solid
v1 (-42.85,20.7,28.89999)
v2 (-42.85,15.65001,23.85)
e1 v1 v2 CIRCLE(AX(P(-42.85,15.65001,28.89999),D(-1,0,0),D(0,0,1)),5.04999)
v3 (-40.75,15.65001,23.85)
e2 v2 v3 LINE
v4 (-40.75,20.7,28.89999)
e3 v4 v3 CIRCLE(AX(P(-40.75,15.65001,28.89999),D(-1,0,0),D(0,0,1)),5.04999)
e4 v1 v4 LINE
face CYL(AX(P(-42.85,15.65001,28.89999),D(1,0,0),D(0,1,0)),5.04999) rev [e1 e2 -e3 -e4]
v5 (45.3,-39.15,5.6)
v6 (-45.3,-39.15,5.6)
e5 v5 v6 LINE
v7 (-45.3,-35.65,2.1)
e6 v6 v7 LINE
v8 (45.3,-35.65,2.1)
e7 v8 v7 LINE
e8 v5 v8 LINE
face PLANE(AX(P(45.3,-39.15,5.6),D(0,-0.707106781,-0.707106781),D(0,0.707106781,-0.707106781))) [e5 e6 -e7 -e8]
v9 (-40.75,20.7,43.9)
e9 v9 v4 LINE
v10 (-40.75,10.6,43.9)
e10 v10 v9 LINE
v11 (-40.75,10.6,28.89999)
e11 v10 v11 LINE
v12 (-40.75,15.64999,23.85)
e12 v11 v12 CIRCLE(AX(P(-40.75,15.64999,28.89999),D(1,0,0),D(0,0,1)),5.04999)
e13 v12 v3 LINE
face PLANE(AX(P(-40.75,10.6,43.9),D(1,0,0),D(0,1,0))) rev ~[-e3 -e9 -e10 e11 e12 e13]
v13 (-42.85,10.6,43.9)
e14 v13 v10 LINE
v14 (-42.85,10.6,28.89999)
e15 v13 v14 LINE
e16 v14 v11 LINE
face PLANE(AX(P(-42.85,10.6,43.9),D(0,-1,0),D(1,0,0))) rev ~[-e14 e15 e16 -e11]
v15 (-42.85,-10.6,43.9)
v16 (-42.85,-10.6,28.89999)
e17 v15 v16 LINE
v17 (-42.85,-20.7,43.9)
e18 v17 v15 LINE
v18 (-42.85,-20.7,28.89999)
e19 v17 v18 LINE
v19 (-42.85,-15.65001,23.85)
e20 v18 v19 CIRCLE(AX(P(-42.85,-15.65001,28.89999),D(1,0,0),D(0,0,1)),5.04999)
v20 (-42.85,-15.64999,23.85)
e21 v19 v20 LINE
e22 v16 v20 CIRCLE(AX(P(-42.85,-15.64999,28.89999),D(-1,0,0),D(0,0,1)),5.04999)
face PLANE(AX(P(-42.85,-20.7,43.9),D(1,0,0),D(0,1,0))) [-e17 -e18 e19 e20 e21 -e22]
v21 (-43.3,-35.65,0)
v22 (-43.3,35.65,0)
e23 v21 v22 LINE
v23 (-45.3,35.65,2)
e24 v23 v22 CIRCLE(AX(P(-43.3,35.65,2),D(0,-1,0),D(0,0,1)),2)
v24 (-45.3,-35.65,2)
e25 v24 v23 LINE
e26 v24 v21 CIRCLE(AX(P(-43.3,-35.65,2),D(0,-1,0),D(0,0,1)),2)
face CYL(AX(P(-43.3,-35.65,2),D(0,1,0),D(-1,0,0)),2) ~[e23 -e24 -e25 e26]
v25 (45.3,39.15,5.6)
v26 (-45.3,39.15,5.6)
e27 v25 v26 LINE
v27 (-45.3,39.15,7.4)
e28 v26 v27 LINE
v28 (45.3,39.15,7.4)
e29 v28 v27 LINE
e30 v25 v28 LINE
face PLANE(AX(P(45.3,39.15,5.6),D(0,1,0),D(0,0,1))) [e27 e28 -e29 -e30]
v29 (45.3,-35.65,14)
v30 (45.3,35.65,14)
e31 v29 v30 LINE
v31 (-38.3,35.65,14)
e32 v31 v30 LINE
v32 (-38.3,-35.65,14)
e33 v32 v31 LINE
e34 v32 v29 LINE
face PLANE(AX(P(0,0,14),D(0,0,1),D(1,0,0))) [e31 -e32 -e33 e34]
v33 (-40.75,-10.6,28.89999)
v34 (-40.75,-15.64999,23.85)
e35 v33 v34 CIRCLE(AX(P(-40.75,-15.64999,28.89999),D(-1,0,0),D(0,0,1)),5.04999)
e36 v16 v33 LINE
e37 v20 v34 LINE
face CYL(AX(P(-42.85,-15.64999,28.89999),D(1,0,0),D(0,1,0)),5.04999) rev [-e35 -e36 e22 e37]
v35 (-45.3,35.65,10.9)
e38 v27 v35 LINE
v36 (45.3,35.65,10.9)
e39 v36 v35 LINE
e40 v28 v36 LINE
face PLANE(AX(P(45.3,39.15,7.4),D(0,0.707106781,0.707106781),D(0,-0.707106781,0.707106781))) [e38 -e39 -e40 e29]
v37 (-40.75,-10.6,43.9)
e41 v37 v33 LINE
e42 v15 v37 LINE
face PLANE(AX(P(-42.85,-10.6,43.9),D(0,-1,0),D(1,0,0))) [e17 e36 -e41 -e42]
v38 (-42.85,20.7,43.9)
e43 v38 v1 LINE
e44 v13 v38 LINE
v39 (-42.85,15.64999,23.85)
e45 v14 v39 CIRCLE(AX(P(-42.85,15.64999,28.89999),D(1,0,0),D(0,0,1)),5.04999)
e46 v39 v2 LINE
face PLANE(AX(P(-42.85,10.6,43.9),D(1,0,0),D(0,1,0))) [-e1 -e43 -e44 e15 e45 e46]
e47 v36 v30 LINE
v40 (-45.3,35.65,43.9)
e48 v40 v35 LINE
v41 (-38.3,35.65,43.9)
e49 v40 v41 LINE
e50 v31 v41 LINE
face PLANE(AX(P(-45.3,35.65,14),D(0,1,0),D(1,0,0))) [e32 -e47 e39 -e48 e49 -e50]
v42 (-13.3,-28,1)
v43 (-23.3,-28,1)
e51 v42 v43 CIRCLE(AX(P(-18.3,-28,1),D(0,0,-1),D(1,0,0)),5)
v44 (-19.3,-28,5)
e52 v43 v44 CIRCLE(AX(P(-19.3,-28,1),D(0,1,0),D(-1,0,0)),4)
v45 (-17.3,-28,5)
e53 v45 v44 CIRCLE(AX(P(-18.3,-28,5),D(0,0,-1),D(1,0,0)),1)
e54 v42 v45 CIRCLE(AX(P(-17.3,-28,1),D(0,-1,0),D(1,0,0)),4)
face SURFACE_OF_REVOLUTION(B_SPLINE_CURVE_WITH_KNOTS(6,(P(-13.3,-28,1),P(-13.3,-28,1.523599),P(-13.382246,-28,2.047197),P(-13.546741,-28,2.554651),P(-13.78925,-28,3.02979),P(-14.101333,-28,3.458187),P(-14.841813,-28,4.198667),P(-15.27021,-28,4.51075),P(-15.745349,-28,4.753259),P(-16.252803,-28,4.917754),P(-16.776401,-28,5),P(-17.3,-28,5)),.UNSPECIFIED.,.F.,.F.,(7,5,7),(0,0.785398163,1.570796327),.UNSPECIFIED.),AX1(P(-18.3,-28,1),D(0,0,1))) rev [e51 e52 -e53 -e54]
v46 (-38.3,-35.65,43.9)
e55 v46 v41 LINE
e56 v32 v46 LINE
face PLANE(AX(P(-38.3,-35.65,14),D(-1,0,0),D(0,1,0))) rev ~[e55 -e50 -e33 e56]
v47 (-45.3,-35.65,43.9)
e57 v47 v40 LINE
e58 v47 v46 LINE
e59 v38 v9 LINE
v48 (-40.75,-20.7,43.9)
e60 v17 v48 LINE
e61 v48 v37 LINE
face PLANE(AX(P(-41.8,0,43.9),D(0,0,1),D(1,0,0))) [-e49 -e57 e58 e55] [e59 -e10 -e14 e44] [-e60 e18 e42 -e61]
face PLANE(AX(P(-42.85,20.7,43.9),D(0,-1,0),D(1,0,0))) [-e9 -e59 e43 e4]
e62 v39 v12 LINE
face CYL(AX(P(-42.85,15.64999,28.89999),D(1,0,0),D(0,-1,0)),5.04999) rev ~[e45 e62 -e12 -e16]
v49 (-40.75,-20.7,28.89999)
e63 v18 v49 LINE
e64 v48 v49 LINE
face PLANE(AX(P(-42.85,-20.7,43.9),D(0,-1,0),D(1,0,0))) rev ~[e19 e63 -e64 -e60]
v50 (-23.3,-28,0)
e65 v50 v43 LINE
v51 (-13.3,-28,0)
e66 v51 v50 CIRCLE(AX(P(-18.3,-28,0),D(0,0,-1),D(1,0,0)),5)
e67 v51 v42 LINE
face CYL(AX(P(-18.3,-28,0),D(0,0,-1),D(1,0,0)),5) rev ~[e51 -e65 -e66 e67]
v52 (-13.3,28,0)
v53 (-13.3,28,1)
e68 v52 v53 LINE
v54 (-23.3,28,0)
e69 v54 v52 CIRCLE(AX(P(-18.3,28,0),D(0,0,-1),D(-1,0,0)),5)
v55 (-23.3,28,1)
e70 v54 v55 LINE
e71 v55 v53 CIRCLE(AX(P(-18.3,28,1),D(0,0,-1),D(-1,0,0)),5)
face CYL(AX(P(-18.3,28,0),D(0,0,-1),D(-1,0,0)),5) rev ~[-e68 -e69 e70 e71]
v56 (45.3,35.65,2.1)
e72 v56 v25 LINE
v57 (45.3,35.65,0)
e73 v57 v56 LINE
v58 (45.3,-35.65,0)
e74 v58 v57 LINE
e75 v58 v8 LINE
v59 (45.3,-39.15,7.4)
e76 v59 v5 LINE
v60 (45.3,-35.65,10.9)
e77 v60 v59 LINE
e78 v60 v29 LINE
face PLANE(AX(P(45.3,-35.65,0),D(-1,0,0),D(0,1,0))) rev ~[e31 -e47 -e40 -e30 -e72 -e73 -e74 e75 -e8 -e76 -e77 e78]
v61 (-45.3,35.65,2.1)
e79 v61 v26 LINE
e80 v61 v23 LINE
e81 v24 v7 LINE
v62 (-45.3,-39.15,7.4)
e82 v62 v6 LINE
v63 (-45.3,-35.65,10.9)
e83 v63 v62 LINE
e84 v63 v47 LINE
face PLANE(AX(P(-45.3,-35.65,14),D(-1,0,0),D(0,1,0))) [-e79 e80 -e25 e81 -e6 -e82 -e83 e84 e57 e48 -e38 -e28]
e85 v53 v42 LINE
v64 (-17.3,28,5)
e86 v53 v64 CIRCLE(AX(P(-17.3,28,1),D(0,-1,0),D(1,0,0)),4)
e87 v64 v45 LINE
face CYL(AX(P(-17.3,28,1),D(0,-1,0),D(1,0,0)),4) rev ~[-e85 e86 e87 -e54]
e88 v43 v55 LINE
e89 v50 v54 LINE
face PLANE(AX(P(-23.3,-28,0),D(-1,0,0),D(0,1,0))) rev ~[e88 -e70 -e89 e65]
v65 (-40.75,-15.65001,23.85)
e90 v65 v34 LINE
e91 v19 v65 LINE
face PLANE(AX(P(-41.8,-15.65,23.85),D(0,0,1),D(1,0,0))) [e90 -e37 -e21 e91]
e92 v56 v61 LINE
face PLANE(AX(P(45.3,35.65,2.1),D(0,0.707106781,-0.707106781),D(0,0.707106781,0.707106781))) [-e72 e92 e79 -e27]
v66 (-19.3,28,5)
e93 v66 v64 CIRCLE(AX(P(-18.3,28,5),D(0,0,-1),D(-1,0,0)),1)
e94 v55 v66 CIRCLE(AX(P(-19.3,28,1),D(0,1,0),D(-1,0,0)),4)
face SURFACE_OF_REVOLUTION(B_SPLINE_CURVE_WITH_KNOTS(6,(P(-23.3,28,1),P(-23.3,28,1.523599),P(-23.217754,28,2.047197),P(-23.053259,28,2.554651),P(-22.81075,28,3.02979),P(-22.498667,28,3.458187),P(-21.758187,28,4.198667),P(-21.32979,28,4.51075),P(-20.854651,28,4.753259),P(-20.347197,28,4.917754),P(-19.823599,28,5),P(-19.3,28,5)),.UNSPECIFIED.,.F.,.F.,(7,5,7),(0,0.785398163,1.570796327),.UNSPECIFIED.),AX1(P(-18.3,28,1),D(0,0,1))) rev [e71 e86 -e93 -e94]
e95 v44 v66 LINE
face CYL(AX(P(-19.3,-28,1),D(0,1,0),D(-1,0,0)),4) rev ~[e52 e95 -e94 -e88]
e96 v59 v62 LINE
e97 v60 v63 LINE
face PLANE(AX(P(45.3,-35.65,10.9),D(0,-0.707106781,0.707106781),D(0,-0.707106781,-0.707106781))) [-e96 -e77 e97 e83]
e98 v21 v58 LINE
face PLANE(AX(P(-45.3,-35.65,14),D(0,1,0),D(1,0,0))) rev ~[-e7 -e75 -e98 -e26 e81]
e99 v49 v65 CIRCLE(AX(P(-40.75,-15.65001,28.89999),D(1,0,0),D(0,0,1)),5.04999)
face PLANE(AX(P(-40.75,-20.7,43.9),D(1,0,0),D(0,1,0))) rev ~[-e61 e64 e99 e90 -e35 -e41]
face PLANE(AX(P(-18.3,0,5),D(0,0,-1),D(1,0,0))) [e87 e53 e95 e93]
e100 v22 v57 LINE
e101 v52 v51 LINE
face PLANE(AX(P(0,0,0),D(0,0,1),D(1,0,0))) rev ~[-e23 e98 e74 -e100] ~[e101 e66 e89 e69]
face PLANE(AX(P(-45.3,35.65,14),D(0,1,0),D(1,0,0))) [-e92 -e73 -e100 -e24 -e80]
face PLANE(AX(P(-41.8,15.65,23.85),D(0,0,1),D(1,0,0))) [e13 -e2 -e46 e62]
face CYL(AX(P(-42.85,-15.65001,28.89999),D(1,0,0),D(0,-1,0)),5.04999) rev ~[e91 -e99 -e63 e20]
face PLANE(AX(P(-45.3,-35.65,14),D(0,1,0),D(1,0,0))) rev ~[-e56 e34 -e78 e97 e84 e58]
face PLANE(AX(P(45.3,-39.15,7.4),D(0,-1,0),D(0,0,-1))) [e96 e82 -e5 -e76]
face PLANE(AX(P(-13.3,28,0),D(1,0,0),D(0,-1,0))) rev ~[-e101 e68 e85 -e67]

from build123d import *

# Parameters (mm, degrees)
F0_W      = 90.6
F0_H      = 71.3
F1_DEPTH  = 14
F2_W      = 7
F2_H      = 71.3
F3_DEPTH  = 29.9
F5_DEPTH  = 90.6
F7_W      = 2.1
F7_H      = 10.1
F8_DEPTH  = 20.05
F9_R      = 5.04999
F10_R     = 2
F12_DEPTH = 5
F13_R     = 4


# Not quite as in the source:
# - a fillet or chamfer is up to 0.001 mm smaller than in the source, because OpenCascade refuses the exact size


with BuildPart() as f1:
    # F0 (on Top) → F1 (new body)
    with BuildSketch(Plane.XY):
        Rectangle(F0_W, F0_H)
    extrude(amount=F1_DEPTH)

    # F2 (on face) → F3 (join)
    with BuildSketch(Plane.XY.offset(14)):
        with Locations((-41.8, 0)):
            Rectangle(F2_W, F2_H)
    extrude(amount=F3_DEPTH)


with BuildPart() as f5:
    # F4 (on face) → F5 (new body)
    with BuildSketch(Plane.YZ.offset(45.3)):
        Polygon((-39.15, 5.6), (-35.65, 2.1), (-35.65, 10.9), (-39.15, 7.4), align=None)
    extrude(amount=-F5_DEPTH)


with BuildPart() as f5b:
    # F4 (on face) → F5, piece 2 (new body)
    with BuildSketch(Plane.YZ.offset(45.3)):
        Polygon((35.65, 10.9), (35.65, 2.1), (39.15, 5.6), (39.15, 7.4), align=None)
    extrude(amount=-F5_DEPTH)


with BuildPart() as f5_1:
    add(f5.part)

    # F6: union F1, F5b
    add(f1.part)
    add(f5b.part)

    # F7 (on face) → F8 (cut)
    with BuildSketch(Plane.XY.offset(43.9)):
        with Locations((-41.8, -15.65)):
            Rectangle(F7_W, F7_H)
        with Locations((-41.8, 15.65)):
            Rectangle(F7_W, F7_H)
    extrude(amount=-F8_DEPTH, mode=Mode.SUBTRACT)

    # F9 (radius 5.05 in the source; OpenCascade refuses exactly that, so slightly less here)
    f9_edges = [f5_1.edges().sort_by_distance(p)[0] for p in [
        (-41.8, -20.7, 23.85),
        (-41.8, -10.6, 23.85),
        (-41.8, 20.7, 23.85),
        (-41.8, 10.6, 23.85),
    ]]
    fillet(f9_edges, radius=F9_R)

    # F10
    f10_edges = [f5_1.edges().sort_by_distance(p)[0] for p in [
        (-45.3, 0, 0),
    ]]
    fillet(f10_edges, radius=F10_R)

    # F11 (on face) → F12 (cut)
    with BuildSketch(Plane(origin=(0, 0, 0), x_dir=(1, 0, 0), z_dir=(0, 0, -1))):
        with BuildLine():
            Line((-23.3, 28), (-23.3, -28))
            ThreePointArc((-23.3, -28), (-18.3, -33), (-13.3, -28))
            Line((-13.3, -28), (-13.3, 28))
            ThreePointArc((-13.3, 28), (-18.3, 33), (-23.3, 28))
        make_face()
    extrude(amount=-F12_DEPTH, mode=Mode.SUBTRACT)

    # F13
    f13_edges = [f5_1.edges().sort_by_distance(p)[0] for p in [
        (-23.3, 0, 5),
        (-18.3, 33, 5),
        (-13.3, 0, 5),
        (-18.3, -33, 5),
    ]]
    fillet(f13_edges, radius=F13_R)


solid = f5_1.part
